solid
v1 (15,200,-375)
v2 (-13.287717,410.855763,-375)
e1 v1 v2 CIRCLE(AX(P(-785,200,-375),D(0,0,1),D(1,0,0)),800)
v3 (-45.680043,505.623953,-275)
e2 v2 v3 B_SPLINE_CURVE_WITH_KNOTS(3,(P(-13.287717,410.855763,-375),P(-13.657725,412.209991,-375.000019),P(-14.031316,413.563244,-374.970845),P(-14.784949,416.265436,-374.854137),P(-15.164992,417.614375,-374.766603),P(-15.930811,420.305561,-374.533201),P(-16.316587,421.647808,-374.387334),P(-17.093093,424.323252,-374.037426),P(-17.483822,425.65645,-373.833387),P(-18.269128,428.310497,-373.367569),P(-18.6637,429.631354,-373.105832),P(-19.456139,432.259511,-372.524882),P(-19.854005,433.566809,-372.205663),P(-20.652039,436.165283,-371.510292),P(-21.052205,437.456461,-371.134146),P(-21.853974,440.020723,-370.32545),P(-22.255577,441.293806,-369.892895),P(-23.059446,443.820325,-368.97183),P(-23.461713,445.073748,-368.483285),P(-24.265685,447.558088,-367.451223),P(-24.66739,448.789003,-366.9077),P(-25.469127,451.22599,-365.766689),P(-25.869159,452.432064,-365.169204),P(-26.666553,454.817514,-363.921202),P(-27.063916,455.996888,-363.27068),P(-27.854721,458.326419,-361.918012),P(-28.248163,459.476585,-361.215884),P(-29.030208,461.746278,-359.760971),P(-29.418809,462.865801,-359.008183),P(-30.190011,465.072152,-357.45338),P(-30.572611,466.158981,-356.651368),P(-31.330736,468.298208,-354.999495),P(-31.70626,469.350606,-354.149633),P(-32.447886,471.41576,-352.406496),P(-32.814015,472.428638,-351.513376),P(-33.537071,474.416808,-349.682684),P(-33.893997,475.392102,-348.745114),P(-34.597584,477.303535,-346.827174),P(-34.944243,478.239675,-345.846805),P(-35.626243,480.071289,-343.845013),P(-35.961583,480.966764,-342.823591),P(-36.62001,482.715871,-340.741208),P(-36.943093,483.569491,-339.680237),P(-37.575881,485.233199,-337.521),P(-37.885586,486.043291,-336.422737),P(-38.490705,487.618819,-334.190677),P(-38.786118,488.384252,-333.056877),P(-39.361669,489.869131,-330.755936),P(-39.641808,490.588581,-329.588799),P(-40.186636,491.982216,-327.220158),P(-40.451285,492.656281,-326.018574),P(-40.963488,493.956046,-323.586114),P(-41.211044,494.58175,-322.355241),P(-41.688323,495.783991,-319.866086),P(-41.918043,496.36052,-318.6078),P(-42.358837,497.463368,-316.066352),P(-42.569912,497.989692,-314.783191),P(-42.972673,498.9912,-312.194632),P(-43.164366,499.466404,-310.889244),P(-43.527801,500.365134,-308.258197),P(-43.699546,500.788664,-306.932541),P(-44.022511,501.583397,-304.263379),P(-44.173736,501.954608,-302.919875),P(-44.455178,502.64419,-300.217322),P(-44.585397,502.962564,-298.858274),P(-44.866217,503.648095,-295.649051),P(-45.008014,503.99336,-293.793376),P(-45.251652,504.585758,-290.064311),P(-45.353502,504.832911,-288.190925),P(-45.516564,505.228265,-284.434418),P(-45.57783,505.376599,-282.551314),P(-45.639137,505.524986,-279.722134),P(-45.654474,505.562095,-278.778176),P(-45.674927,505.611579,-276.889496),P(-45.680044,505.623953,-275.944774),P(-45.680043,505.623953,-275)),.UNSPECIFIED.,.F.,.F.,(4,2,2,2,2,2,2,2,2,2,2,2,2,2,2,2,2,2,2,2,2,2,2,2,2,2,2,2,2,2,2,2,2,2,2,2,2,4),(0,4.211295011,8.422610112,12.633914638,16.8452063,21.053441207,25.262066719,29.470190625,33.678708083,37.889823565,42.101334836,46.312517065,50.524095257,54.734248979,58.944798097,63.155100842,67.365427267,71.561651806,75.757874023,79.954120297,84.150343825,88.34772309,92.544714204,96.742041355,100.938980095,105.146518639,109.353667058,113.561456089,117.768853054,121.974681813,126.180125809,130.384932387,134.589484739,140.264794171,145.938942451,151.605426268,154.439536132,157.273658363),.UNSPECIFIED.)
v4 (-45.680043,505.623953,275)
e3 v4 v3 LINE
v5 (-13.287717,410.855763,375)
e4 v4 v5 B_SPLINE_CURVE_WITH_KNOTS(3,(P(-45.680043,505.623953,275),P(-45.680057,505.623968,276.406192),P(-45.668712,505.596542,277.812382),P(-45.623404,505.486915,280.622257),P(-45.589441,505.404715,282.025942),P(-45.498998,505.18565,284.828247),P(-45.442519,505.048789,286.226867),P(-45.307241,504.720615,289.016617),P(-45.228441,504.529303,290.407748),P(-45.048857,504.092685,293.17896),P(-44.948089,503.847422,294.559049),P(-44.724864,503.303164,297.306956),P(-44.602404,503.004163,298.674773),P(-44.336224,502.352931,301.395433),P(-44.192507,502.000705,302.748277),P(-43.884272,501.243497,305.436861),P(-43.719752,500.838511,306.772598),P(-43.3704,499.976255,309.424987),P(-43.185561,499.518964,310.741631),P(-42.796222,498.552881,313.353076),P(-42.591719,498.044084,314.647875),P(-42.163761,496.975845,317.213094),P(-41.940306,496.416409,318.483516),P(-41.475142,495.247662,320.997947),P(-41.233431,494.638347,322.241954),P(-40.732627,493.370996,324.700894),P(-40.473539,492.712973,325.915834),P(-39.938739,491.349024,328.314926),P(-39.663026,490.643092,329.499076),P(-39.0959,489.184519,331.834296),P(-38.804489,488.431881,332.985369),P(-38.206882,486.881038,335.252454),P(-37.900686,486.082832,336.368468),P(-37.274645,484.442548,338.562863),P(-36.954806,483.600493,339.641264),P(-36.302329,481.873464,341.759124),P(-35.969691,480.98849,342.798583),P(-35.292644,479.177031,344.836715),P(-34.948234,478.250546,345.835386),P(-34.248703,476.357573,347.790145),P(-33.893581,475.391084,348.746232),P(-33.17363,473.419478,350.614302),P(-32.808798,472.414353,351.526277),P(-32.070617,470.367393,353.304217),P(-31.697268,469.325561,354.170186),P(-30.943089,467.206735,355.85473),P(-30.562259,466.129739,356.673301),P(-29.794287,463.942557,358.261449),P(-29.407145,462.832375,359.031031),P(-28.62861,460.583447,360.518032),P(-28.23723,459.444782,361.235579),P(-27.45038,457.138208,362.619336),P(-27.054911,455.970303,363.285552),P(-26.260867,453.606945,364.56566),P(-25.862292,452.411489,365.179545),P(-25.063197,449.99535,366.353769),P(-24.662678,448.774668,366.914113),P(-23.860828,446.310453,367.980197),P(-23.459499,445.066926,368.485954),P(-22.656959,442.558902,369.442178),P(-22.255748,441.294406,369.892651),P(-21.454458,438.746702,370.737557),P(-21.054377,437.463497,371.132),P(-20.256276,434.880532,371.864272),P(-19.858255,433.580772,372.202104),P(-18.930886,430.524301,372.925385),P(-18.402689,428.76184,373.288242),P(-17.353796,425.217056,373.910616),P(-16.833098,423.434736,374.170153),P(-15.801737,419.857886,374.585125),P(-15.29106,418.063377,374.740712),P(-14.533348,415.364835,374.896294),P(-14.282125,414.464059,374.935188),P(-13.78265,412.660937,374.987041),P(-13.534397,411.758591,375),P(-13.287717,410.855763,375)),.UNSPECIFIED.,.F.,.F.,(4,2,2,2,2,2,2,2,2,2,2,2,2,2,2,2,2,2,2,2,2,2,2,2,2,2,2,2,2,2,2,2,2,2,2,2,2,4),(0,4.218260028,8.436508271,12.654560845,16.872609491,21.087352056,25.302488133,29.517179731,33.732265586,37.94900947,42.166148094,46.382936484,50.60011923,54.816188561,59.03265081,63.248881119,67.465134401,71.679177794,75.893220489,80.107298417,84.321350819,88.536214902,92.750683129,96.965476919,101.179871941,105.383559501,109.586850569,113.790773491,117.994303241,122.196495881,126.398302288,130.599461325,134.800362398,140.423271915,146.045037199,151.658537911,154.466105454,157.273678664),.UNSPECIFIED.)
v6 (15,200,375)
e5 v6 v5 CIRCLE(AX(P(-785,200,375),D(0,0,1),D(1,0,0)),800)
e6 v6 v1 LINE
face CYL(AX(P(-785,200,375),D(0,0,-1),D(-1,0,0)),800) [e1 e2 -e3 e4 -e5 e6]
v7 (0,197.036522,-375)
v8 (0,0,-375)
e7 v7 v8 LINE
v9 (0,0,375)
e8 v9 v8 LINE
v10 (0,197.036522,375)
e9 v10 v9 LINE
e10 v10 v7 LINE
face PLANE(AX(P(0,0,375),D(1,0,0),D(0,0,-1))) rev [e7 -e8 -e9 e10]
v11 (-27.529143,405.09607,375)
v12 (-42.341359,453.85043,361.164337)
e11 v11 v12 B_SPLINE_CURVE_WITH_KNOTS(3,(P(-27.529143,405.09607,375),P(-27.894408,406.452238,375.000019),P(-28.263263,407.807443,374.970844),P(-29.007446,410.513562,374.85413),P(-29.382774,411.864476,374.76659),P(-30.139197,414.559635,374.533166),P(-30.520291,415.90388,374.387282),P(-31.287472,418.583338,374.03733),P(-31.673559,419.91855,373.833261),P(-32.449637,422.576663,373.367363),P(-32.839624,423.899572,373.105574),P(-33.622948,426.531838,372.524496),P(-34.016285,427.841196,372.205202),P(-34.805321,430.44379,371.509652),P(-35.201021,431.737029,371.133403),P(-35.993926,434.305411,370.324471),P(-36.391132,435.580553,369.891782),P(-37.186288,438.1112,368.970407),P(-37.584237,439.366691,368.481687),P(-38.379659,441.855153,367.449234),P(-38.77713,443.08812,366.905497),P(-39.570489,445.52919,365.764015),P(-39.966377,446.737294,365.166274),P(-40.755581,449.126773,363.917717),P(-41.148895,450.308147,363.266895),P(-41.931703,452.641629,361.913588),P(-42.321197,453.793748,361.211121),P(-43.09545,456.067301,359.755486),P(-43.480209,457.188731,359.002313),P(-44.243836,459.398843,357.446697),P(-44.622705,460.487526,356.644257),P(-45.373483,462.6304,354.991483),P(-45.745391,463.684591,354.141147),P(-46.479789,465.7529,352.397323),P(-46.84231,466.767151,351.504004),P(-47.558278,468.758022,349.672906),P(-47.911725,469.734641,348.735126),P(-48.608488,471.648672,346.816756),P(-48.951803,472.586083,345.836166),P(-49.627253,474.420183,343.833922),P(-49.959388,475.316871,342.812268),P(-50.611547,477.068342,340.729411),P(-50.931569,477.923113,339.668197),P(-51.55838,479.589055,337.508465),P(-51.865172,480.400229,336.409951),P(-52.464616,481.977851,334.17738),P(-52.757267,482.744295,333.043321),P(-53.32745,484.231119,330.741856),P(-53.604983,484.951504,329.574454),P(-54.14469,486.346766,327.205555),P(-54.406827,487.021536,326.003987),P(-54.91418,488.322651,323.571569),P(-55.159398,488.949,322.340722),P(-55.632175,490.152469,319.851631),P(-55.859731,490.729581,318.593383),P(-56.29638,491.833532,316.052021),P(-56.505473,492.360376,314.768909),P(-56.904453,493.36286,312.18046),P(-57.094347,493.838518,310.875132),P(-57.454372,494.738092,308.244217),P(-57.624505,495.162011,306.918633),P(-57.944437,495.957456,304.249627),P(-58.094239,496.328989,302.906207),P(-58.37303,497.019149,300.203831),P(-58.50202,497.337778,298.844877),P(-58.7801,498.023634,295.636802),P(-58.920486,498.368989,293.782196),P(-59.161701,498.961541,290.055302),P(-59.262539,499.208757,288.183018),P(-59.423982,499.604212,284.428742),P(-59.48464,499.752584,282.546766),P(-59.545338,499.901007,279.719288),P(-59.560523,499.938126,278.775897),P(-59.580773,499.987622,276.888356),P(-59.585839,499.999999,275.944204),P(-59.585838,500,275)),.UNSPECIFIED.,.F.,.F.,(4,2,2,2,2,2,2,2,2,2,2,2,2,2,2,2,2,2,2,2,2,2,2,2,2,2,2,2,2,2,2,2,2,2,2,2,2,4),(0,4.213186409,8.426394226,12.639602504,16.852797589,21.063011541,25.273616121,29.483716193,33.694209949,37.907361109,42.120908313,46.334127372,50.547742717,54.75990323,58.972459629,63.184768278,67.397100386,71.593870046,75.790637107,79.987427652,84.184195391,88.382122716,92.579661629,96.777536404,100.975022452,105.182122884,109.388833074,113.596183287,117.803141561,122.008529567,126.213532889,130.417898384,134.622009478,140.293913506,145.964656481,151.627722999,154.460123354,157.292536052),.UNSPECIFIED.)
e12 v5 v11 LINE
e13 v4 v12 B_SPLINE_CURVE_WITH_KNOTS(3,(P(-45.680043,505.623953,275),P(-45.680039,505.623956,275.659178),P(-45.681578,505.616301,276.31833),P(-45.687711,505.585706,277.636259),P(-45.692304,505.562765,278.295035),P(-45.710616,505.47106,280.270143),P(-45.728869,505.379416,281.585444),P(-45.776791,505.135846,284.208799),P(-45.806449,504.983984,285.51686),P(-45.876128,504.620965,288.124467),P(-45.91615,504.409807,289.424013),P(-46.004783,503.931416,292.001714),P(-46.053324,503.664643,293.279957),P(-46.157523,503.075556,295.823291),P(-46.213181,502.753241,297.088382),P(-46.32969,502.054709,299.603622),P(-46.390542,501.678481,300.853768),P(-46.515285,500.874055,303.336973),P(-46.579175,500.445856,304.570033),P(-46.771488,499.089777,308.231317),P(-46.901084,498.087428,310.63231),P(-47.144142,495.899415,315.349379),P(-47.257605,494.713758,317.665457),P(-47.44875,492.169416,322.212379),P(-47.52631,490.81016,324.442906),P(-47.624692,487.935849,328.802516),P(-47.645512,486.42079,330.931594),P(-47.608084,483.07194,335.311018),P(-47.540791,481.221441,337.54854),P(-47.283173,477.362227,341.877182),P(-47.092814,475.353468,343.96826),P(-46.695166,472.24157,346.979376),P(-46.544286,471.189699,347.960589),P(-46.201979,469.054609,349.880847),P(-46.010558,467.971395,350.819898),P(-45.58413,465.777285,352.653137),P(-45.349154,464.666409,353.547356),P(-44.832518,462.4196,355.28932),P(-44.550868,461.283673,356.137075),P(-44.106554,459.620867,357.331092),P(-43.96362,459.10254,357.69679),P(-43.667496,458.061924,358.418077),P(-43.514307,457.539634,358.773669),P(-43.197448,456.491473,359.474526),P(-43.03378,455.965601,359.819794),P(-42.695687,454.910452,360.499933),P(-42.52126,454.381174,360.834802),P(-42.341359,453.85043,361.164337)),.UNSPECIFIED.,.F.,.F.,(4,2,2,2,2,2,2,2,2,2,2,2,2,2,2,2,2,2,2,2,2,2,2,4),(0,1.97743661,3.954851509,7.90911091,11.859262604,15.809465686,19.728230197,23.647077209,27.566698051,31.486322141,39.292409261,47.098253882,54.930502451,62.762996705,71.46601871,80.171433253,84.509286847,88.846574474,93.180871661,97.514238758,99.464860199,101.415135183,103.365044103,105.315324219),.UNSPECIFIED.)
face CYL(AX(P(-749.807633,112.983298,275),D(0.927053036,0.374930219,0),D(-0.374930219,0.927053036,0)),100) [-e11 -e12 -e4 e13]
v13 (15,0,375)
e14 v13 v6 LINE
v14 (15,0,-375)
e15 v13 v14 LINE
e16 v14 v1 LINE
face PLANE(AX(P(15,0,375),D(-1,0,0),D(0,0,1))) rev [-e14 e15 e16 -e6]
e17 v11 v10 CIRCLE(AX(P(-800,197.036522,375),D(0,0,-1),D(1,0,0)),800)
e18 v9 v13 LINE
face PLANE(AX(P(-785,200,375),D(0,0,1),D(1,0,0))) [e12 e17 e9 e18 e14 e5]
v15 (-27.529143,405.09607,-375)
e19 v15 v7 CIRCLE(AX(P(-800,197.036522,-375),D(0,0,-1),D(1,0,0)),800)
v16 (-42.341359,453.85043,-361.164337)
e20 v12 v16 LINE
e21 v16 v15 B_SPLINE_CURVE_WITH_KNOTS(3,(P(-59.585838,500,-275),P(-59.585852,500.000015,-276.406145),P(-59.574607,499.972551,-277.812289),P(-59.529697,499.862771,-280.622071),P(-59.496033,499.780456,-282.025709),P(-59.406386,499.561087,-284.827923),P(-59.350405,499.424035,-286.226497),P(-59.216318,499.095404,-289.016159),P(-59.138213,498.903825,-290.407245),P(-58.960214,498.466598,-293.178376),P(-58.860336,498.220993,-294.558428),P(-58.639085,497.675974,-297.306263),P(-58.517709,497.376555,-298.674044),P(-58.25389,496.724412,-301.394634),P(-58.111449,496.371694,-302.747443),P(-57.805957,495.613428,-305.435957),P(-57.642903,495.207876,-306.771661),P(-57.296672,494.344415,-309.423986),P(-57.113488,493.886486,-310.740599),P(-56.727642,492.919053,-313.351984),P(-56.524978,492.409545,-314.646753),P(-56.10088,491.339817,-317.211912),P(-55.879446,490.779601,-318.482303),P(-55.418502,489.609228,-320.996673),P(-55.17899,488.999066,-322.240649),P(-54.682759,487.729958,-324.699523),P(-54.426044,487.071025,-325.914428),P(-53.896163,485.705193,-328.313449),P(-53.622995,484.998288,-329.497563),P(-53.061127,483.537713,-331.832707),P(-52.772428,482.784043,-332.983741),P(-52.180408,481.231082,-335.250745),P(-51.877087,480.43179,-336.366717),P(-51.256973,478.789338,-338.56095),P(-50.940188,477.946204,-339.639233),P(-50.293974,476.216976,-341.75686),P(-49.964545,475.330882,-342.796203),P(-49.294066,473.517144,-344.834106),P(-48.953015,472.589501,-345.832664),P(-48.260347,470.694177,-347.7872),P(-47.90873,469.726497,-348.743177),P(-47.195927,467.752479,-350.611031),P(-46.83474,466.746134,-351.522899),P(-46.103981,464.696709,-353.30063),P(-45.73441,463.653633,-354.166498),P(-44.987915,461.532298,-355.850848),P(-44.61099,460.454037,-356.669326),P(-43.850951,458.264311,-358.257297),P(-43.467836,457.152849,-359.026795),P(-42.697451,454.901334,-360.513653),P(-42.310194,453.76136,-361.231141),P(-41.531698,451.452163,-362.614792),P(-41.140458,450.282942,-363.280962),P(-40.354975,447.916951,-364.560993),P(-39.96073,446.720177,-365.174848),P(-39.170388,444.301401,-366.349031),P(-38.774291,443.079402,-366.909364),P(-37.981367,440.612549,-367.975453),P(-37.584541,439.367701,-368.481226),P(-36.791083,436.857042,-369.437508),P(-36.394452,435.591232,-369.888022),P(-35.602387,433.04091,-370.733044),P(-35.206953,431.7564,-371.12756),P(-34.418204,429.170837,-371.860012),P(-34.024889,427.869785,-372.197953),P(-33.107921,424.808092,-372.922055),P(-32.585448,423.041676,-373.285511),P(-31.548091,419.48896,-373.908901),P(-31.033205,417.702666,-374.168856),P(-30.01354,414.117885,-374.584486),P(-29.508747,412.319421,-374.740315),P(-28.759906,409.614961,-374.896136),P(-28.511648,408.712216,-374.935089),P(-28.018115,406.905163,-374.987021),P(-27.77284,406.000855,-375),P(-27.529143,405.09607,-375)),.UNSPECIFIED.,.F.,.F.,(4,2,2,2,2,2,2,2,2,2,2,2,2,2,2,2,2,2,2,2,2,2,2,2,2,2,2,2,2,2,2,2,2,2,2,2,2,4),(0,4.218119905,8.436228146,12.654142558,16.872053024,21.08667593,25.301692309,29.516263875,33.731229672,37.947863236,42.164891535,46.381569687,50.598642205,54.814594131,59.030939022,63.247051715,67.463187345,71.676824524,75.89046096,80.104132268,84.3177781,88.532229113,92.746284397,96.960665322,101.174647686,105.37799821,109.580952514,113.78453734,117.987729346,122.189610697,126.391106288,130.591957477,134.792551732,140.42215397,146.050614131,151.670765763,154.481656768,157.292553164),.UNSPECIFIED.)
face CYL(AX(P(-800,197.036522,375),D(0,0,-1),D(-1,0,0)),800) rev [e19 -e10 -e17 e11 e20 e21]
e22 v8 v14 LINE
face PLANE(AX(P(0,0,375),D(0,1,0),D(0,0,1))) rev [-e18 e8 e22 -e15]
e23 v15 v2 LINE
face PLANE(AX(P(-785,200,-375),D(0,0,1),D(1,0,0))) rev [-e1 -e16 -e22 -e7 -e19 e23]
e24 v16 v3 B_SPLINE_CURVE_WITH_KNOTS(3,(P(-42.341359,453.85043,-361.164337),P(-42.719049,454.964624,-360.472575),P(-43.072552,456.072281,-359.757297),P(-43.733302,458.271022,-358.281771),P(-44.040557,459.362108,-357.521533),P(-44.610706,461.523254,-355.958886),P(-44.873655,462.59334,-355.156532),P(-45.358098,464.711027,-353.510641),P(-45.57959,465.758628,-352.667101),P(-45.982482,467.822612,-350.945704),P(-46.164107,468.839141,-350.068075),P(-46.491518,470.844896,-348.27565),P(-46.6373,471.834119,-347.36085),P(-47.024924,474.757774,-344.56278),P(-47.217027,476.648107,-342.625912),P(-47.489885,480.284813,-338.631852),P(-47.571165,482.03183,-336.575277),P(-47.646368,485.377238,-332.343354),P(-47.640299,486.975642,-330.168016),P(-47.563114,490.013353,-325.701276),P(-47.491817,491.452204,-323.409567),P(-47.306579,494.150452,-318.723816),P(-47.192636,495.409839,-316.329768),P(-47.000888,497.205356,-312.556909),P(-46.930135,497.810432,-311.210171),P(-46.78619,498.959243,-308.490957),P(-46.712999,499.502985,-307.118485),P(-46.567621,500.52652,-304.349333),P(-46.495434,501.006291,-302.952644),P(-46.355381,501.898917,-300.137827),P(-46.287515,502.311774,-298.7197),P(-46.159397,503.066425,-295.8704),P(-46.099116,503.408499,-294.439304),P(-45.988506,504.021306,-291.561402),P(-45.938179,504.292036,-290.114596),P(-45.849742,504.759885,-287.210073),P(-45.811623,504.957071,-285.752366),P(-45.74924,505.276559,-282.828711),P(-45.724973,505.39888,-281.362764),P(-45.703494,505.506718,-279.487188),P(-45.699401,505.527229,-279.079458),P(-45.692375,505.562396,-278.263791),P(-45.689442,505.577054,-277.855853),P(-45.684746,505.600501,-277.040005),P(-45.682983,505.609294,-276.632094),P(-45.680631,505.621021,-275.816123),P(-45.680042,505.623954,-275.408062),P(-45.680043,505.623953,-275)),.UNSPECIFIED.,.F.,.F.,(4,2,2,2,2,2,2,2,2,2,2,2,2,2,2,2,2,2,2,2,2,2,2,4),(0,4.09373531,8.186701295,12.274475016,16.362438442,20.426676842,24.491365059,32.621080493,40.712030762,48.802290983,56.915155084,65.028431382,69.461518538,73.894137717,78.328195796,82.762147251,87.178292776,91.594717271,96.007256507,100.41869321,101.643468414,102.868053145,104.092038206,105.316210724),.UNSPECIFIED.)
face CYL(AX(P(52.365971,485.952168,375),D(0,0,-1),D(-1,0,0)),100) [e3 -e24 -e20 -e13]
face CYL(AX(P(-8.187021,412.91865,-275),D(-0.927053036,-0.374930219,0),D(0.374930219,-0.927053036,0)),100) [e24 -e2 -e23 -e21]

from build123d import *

# Parameters (mm, degrees)
BOSS_EXTRUDE1_DEPTH = 375
FILLET1_R           = 100
FILLET2_R           = 100


with BuildPart() as part:
    # Sketch2 → Boss-Extrude1 (new, symmetric)
    with BuildSketch(Plane.XY):
        with BuildLine():
            Line((0, 0), (0, 197.03652177061554))
            ThreePointArc((0, 197.03652177061554), (-15.037794104979639, 351.42024926941554), (-59.58583829105939, 499.99999999999994))
            Line((-59.58583829105939, 499.99999999999994), (-45.68004275536319, 505.62395328211494))
            ThreePointArc((-45.68004275536319, 505.62395328211494), (-0.31663526116813046, 355.79479163998155), (15, 200))
            Line((15, 200), (15, 0))
            Line((15, 0), (0, 0))
        make_face()
    extrude(amount=BOSS_EXTRUDE1_DEPTH, both=True)

    # Fillet1
    fillet1_edges = [part.edges().sort_by_distance(p)[0] for p in [
        (-52.63294052321129, 502.8119766410574, 375),
        (-52.63294052321129, 502.8119766410574, -375),
    ]]
    fillet(fillet1_edges, radius=FILLET1_R)

    # Fillet2
    # the kernel refuses this fillet: 100 mm, written as the material it takes off along each edge
    with BuildSketch(Plane(origin=(-59.585838291059304, 500, -398.16540938759147), x_dir=(0.35002683735088513, -0.9367396720189324, 0), z_dir=(0, 0, 1))) as fillet2_piece_1:
        with BuildLine():
            CenterArc((52.34529898972619, 99.95258338935764), FILLET2_R, 238.16595036799683, 30.069556200548902)
            Line((-0.40077852073035836, 14.99464493001819), (-1.4557000709394878, 13.295486160831398))
            ThreePointArc((-1.4557000709394878, 13.295486160831398), (-2.1996752510342628, 7.443885328911702), (-1.9992859906690836, -0.05343713609739175))
            Line((-1.9992859906690836, -0.05343713609739175), (0.06158270469381519, -1.9990516677871575))
            ThreePointArc((0.06158270469381519, -1.9990516677871575), (24.633081877518478, -1.6206671148610328), (49.20458105034301, -1.999051667787162))
            Line((49.20458105034301, -1.999051667787162), (49.266163755036786, -3.27e-15))
        make_face()
    extrude(amount=796.3308187751829, mode=Mode.SUBTRACT)


solid = part.part
